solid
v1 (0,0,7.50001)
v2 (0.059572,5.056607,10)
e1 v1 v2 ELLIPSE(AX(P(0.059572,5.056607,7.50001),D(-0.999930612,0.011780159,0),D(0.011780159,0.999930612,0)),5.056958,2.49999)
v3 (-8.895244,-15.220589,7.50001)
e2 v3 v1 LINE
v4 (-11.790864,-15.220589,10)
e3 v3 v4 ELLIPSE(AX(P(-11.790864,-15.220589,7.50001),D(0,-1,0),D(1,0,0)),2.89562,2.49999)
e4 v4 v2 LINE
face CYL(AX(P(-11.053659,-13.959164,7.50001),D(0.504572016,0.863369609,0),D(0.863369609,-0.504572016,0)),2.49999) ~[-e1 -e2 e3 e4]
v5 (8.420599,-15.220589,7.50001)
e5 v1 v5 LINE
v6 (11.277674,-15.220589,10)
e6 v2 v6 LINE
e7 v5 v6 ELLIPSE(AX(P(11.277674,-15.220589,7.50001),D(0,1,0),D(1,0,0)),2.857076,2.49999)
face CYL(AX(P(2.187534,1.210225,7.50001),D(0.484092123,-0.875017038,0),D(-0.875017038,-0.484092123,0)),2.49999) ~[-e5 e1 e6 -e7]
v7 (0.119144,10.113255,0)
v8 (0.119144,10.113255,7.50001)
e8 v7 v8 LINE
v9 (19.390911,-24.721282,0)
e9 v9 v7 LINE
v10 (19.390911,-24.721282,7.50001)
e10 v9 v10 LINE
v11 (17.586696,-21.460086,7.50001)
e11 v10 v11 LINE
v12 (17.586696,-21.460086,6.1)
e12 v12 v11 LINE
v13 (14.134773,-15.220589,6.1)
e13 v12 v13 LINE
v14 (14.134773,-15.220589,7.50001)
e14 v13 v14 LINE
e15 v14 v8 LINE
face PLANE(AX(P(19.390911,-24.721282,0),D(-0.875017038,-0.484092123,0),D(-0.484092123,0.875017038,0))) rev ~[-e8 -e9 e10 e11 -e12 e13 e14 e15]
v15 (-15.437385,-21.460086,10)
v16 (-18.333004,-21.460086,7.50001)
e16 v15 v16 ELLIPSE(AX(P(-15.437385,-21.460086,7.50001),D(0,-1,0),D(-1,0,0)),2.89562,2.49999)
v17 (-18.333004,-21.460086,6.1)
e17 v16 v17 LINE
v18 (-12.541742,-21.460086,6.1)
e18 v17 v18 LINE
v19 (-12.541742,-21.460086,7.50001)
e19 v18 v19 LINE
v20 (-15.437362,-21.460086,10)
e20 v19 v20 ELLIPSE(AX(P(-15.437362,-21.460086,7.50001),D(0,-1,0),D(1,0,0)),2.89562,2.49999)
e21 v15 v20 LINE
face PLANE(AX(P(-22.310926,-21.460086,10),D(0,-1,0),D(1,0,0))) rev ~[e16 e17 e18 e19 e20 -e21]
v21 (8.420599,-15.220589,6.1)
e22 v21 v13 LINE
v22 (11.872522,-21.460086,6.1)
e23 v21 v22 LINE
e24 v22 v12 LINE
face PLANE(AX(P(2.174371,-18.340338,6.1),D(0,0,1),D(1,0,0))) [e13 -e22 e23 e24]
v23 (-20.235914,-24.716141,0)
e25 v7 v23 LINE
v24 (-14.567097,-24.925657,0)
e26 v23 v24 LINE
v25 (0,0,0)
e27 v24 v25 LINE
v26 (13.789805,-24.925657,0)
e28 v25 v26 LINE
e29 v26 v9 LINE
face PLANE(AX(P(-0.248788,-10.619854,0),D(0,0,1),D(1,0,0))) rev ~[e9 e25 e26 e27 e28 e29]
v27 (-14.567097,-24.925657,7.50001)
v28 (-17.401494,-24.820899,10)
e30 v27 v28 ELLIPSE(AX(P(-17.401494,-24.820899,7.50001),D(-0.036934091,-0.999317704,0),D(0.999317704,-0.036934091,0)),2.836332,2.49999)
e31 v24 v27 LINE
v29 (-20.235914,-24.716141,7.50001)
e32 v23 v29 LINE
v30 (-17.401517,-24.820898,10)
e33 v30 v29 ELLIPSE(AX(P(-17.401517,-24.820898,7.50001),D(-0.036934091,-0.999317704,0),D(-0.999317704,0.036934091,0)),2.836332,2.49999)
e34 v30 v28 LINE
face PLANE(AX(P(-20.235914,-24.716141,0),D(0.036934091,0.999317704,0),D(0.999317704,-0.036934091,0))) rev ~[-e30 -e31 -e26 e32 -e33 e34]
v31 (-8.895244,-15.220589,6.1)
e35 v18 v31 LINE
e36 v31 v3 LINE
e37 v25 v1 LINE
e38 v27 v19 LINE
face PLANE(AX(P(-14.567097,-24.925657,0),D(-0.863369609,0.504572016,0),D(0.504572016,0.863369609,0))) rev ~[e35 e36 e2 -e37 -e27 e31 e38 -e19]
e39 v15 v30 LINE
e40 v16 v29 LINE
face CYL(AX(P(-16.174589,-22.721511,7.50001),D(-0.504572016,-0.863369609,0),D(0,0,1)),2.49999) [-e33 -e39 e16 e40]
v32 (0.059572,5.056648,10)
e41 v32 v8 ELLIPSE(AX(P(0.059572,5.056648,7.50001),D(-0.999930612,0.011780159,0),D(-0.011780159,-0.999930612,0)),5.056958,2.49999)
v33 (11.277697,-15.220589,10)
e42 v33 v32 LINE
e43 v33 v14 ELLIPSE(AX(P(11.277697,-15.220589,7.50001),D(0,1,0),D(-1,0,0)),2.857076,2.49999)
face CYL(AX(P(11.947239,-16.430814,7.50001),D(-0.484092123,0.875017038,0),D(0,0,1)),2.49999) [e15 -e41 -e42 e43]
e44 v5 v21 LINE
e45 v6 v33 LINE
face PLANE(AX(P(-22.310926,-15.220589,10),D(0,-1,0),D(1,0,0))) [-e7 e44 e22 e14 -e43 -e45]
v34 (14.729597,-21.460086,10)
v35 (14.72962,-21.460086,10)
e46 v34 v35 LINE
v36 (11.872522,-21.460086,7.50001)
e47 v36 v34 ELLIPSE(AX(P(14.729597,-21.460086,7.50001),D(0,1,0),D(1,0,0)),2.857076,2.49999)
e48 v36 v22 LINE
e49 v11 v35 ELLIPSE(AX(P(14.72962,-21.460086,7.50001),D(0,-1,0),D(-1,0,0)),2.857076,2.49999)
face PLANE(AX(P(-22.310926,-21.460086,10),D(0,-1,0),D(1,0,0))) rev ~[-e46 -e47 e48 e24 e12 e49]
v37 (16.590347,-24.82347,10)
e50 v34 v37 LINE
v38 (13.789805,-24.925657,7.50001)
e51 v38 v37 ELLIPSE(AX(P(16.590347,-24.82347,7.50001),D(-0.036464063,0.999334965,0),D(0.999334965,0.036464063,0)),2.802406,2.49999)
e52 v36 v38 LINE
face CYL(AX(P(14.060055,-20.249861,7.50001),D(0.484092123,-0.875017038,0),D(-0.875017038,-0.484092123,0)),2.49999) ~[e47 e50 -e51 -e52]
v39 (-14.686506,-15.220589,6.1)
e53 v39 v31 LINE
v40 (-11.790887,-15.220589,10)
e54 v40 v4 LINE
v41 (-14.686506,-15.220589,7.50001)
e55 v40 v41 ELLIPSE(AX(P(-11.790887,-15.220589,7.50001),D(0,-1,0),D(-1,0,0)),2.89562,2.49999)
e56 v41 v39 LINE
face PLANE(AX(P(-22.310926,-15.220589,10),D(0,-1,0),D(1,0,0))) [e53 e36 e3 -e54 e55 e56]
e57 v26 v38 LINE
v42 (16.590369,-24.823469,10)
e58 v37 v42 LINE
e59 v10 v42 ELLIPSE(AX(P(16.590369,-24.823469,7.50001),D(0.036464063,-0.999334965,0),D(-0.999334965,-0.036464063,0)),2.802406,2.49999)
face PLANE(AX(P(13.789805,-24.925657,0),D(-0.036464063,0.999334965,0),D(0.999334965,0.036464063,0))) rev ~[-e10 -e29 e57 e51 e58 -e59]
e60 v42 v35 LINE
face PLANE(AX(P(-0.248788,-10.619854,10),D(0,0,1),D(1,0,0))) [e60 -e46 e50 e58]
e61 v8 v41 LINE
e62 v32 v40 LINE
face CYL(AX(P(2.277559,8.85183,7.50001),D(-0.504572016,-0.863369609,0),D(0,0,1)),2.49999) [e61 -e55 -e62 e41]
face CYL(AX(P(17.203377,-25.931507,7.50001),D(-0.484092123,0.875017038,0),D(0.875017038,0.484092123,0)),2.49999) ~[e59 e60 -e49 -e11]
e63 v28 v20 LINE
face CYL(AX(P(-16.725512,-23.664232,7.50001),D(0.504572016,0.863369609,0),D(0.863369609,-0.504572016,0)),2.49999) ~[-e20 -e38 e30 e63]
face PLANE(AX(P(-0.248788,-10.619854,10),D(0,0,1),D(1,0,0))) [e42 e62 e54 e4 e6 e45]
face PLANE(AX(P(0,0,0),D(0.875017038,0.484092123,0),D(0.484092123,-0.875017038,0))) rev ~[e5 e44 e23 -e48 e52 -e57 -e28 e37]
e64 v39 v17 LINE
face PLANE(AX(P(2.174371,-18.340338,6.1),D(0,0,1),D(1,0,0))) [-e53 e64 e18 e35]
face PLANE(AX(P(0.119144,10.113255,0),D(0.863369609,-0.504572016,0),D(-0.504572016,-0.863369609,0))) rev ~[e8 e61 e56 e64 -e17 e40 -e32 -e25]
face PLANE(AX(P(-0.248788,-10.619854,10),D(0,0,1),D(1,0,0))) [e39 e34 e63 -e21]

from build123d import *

# Parameters (mm, degrees)
F1_DEPTH = 10
F2_W     = 48.9705931395
F2_H     = 6.2394971028
F3_DEPTH = 3.9
F4_R     = 2.49999


# Not quite as in the source:
# - a fillet or chamfer is up to 0.001 mm smaller than in the source, because OpenCascade refuses the exact size


with BuildPart() as f1:
    # F0 (on Top) → F1 (new body)
    with BuildSketch(Plane.XY):
        Polygon((-14.5670969574, -24.9256566167), (0, 0), (13.7898046523, -24.9256566167), (19.3909112023, -24.7212815966), (0.1191440202, 10.1132547357), (-20.2359139567, -24.7161410615), align=None)
    extrude(amount=F1_DEPTH)

    # F2 (on face) → F3 (cut)
    with BuildSketch(Plane.XY.offset(10)):
        with Locations((2.1743709221, -18.3403375559)):
            Rectangle(F2_W, F2_H)
    extrude(amount=-F3_DEPTH, mode=Mode.SUBTRACT)

    # F4 (radius 2.5 in the source; OpenCascade refuses exactly that, so slightly less here)
    f4_edges = [f1.edges().sort_by_distance(p)[0] for p in [
        (-7.283681, -2.553667, 10),
        (7.126959, -2.553667, 10),
        (-4.447622, -7.610295, 10),
        (4.210299, -7.610295, 10),
        (-19.284459, -23.088114, 10),
        (-13.554419, -23.192871, 10),
        (12.831163, -23.192871, 10),
        (18.488804, -23.090684, 10),
    ]]
    fillet(f4_edges, radius=F4_R)


solid = f1.part
